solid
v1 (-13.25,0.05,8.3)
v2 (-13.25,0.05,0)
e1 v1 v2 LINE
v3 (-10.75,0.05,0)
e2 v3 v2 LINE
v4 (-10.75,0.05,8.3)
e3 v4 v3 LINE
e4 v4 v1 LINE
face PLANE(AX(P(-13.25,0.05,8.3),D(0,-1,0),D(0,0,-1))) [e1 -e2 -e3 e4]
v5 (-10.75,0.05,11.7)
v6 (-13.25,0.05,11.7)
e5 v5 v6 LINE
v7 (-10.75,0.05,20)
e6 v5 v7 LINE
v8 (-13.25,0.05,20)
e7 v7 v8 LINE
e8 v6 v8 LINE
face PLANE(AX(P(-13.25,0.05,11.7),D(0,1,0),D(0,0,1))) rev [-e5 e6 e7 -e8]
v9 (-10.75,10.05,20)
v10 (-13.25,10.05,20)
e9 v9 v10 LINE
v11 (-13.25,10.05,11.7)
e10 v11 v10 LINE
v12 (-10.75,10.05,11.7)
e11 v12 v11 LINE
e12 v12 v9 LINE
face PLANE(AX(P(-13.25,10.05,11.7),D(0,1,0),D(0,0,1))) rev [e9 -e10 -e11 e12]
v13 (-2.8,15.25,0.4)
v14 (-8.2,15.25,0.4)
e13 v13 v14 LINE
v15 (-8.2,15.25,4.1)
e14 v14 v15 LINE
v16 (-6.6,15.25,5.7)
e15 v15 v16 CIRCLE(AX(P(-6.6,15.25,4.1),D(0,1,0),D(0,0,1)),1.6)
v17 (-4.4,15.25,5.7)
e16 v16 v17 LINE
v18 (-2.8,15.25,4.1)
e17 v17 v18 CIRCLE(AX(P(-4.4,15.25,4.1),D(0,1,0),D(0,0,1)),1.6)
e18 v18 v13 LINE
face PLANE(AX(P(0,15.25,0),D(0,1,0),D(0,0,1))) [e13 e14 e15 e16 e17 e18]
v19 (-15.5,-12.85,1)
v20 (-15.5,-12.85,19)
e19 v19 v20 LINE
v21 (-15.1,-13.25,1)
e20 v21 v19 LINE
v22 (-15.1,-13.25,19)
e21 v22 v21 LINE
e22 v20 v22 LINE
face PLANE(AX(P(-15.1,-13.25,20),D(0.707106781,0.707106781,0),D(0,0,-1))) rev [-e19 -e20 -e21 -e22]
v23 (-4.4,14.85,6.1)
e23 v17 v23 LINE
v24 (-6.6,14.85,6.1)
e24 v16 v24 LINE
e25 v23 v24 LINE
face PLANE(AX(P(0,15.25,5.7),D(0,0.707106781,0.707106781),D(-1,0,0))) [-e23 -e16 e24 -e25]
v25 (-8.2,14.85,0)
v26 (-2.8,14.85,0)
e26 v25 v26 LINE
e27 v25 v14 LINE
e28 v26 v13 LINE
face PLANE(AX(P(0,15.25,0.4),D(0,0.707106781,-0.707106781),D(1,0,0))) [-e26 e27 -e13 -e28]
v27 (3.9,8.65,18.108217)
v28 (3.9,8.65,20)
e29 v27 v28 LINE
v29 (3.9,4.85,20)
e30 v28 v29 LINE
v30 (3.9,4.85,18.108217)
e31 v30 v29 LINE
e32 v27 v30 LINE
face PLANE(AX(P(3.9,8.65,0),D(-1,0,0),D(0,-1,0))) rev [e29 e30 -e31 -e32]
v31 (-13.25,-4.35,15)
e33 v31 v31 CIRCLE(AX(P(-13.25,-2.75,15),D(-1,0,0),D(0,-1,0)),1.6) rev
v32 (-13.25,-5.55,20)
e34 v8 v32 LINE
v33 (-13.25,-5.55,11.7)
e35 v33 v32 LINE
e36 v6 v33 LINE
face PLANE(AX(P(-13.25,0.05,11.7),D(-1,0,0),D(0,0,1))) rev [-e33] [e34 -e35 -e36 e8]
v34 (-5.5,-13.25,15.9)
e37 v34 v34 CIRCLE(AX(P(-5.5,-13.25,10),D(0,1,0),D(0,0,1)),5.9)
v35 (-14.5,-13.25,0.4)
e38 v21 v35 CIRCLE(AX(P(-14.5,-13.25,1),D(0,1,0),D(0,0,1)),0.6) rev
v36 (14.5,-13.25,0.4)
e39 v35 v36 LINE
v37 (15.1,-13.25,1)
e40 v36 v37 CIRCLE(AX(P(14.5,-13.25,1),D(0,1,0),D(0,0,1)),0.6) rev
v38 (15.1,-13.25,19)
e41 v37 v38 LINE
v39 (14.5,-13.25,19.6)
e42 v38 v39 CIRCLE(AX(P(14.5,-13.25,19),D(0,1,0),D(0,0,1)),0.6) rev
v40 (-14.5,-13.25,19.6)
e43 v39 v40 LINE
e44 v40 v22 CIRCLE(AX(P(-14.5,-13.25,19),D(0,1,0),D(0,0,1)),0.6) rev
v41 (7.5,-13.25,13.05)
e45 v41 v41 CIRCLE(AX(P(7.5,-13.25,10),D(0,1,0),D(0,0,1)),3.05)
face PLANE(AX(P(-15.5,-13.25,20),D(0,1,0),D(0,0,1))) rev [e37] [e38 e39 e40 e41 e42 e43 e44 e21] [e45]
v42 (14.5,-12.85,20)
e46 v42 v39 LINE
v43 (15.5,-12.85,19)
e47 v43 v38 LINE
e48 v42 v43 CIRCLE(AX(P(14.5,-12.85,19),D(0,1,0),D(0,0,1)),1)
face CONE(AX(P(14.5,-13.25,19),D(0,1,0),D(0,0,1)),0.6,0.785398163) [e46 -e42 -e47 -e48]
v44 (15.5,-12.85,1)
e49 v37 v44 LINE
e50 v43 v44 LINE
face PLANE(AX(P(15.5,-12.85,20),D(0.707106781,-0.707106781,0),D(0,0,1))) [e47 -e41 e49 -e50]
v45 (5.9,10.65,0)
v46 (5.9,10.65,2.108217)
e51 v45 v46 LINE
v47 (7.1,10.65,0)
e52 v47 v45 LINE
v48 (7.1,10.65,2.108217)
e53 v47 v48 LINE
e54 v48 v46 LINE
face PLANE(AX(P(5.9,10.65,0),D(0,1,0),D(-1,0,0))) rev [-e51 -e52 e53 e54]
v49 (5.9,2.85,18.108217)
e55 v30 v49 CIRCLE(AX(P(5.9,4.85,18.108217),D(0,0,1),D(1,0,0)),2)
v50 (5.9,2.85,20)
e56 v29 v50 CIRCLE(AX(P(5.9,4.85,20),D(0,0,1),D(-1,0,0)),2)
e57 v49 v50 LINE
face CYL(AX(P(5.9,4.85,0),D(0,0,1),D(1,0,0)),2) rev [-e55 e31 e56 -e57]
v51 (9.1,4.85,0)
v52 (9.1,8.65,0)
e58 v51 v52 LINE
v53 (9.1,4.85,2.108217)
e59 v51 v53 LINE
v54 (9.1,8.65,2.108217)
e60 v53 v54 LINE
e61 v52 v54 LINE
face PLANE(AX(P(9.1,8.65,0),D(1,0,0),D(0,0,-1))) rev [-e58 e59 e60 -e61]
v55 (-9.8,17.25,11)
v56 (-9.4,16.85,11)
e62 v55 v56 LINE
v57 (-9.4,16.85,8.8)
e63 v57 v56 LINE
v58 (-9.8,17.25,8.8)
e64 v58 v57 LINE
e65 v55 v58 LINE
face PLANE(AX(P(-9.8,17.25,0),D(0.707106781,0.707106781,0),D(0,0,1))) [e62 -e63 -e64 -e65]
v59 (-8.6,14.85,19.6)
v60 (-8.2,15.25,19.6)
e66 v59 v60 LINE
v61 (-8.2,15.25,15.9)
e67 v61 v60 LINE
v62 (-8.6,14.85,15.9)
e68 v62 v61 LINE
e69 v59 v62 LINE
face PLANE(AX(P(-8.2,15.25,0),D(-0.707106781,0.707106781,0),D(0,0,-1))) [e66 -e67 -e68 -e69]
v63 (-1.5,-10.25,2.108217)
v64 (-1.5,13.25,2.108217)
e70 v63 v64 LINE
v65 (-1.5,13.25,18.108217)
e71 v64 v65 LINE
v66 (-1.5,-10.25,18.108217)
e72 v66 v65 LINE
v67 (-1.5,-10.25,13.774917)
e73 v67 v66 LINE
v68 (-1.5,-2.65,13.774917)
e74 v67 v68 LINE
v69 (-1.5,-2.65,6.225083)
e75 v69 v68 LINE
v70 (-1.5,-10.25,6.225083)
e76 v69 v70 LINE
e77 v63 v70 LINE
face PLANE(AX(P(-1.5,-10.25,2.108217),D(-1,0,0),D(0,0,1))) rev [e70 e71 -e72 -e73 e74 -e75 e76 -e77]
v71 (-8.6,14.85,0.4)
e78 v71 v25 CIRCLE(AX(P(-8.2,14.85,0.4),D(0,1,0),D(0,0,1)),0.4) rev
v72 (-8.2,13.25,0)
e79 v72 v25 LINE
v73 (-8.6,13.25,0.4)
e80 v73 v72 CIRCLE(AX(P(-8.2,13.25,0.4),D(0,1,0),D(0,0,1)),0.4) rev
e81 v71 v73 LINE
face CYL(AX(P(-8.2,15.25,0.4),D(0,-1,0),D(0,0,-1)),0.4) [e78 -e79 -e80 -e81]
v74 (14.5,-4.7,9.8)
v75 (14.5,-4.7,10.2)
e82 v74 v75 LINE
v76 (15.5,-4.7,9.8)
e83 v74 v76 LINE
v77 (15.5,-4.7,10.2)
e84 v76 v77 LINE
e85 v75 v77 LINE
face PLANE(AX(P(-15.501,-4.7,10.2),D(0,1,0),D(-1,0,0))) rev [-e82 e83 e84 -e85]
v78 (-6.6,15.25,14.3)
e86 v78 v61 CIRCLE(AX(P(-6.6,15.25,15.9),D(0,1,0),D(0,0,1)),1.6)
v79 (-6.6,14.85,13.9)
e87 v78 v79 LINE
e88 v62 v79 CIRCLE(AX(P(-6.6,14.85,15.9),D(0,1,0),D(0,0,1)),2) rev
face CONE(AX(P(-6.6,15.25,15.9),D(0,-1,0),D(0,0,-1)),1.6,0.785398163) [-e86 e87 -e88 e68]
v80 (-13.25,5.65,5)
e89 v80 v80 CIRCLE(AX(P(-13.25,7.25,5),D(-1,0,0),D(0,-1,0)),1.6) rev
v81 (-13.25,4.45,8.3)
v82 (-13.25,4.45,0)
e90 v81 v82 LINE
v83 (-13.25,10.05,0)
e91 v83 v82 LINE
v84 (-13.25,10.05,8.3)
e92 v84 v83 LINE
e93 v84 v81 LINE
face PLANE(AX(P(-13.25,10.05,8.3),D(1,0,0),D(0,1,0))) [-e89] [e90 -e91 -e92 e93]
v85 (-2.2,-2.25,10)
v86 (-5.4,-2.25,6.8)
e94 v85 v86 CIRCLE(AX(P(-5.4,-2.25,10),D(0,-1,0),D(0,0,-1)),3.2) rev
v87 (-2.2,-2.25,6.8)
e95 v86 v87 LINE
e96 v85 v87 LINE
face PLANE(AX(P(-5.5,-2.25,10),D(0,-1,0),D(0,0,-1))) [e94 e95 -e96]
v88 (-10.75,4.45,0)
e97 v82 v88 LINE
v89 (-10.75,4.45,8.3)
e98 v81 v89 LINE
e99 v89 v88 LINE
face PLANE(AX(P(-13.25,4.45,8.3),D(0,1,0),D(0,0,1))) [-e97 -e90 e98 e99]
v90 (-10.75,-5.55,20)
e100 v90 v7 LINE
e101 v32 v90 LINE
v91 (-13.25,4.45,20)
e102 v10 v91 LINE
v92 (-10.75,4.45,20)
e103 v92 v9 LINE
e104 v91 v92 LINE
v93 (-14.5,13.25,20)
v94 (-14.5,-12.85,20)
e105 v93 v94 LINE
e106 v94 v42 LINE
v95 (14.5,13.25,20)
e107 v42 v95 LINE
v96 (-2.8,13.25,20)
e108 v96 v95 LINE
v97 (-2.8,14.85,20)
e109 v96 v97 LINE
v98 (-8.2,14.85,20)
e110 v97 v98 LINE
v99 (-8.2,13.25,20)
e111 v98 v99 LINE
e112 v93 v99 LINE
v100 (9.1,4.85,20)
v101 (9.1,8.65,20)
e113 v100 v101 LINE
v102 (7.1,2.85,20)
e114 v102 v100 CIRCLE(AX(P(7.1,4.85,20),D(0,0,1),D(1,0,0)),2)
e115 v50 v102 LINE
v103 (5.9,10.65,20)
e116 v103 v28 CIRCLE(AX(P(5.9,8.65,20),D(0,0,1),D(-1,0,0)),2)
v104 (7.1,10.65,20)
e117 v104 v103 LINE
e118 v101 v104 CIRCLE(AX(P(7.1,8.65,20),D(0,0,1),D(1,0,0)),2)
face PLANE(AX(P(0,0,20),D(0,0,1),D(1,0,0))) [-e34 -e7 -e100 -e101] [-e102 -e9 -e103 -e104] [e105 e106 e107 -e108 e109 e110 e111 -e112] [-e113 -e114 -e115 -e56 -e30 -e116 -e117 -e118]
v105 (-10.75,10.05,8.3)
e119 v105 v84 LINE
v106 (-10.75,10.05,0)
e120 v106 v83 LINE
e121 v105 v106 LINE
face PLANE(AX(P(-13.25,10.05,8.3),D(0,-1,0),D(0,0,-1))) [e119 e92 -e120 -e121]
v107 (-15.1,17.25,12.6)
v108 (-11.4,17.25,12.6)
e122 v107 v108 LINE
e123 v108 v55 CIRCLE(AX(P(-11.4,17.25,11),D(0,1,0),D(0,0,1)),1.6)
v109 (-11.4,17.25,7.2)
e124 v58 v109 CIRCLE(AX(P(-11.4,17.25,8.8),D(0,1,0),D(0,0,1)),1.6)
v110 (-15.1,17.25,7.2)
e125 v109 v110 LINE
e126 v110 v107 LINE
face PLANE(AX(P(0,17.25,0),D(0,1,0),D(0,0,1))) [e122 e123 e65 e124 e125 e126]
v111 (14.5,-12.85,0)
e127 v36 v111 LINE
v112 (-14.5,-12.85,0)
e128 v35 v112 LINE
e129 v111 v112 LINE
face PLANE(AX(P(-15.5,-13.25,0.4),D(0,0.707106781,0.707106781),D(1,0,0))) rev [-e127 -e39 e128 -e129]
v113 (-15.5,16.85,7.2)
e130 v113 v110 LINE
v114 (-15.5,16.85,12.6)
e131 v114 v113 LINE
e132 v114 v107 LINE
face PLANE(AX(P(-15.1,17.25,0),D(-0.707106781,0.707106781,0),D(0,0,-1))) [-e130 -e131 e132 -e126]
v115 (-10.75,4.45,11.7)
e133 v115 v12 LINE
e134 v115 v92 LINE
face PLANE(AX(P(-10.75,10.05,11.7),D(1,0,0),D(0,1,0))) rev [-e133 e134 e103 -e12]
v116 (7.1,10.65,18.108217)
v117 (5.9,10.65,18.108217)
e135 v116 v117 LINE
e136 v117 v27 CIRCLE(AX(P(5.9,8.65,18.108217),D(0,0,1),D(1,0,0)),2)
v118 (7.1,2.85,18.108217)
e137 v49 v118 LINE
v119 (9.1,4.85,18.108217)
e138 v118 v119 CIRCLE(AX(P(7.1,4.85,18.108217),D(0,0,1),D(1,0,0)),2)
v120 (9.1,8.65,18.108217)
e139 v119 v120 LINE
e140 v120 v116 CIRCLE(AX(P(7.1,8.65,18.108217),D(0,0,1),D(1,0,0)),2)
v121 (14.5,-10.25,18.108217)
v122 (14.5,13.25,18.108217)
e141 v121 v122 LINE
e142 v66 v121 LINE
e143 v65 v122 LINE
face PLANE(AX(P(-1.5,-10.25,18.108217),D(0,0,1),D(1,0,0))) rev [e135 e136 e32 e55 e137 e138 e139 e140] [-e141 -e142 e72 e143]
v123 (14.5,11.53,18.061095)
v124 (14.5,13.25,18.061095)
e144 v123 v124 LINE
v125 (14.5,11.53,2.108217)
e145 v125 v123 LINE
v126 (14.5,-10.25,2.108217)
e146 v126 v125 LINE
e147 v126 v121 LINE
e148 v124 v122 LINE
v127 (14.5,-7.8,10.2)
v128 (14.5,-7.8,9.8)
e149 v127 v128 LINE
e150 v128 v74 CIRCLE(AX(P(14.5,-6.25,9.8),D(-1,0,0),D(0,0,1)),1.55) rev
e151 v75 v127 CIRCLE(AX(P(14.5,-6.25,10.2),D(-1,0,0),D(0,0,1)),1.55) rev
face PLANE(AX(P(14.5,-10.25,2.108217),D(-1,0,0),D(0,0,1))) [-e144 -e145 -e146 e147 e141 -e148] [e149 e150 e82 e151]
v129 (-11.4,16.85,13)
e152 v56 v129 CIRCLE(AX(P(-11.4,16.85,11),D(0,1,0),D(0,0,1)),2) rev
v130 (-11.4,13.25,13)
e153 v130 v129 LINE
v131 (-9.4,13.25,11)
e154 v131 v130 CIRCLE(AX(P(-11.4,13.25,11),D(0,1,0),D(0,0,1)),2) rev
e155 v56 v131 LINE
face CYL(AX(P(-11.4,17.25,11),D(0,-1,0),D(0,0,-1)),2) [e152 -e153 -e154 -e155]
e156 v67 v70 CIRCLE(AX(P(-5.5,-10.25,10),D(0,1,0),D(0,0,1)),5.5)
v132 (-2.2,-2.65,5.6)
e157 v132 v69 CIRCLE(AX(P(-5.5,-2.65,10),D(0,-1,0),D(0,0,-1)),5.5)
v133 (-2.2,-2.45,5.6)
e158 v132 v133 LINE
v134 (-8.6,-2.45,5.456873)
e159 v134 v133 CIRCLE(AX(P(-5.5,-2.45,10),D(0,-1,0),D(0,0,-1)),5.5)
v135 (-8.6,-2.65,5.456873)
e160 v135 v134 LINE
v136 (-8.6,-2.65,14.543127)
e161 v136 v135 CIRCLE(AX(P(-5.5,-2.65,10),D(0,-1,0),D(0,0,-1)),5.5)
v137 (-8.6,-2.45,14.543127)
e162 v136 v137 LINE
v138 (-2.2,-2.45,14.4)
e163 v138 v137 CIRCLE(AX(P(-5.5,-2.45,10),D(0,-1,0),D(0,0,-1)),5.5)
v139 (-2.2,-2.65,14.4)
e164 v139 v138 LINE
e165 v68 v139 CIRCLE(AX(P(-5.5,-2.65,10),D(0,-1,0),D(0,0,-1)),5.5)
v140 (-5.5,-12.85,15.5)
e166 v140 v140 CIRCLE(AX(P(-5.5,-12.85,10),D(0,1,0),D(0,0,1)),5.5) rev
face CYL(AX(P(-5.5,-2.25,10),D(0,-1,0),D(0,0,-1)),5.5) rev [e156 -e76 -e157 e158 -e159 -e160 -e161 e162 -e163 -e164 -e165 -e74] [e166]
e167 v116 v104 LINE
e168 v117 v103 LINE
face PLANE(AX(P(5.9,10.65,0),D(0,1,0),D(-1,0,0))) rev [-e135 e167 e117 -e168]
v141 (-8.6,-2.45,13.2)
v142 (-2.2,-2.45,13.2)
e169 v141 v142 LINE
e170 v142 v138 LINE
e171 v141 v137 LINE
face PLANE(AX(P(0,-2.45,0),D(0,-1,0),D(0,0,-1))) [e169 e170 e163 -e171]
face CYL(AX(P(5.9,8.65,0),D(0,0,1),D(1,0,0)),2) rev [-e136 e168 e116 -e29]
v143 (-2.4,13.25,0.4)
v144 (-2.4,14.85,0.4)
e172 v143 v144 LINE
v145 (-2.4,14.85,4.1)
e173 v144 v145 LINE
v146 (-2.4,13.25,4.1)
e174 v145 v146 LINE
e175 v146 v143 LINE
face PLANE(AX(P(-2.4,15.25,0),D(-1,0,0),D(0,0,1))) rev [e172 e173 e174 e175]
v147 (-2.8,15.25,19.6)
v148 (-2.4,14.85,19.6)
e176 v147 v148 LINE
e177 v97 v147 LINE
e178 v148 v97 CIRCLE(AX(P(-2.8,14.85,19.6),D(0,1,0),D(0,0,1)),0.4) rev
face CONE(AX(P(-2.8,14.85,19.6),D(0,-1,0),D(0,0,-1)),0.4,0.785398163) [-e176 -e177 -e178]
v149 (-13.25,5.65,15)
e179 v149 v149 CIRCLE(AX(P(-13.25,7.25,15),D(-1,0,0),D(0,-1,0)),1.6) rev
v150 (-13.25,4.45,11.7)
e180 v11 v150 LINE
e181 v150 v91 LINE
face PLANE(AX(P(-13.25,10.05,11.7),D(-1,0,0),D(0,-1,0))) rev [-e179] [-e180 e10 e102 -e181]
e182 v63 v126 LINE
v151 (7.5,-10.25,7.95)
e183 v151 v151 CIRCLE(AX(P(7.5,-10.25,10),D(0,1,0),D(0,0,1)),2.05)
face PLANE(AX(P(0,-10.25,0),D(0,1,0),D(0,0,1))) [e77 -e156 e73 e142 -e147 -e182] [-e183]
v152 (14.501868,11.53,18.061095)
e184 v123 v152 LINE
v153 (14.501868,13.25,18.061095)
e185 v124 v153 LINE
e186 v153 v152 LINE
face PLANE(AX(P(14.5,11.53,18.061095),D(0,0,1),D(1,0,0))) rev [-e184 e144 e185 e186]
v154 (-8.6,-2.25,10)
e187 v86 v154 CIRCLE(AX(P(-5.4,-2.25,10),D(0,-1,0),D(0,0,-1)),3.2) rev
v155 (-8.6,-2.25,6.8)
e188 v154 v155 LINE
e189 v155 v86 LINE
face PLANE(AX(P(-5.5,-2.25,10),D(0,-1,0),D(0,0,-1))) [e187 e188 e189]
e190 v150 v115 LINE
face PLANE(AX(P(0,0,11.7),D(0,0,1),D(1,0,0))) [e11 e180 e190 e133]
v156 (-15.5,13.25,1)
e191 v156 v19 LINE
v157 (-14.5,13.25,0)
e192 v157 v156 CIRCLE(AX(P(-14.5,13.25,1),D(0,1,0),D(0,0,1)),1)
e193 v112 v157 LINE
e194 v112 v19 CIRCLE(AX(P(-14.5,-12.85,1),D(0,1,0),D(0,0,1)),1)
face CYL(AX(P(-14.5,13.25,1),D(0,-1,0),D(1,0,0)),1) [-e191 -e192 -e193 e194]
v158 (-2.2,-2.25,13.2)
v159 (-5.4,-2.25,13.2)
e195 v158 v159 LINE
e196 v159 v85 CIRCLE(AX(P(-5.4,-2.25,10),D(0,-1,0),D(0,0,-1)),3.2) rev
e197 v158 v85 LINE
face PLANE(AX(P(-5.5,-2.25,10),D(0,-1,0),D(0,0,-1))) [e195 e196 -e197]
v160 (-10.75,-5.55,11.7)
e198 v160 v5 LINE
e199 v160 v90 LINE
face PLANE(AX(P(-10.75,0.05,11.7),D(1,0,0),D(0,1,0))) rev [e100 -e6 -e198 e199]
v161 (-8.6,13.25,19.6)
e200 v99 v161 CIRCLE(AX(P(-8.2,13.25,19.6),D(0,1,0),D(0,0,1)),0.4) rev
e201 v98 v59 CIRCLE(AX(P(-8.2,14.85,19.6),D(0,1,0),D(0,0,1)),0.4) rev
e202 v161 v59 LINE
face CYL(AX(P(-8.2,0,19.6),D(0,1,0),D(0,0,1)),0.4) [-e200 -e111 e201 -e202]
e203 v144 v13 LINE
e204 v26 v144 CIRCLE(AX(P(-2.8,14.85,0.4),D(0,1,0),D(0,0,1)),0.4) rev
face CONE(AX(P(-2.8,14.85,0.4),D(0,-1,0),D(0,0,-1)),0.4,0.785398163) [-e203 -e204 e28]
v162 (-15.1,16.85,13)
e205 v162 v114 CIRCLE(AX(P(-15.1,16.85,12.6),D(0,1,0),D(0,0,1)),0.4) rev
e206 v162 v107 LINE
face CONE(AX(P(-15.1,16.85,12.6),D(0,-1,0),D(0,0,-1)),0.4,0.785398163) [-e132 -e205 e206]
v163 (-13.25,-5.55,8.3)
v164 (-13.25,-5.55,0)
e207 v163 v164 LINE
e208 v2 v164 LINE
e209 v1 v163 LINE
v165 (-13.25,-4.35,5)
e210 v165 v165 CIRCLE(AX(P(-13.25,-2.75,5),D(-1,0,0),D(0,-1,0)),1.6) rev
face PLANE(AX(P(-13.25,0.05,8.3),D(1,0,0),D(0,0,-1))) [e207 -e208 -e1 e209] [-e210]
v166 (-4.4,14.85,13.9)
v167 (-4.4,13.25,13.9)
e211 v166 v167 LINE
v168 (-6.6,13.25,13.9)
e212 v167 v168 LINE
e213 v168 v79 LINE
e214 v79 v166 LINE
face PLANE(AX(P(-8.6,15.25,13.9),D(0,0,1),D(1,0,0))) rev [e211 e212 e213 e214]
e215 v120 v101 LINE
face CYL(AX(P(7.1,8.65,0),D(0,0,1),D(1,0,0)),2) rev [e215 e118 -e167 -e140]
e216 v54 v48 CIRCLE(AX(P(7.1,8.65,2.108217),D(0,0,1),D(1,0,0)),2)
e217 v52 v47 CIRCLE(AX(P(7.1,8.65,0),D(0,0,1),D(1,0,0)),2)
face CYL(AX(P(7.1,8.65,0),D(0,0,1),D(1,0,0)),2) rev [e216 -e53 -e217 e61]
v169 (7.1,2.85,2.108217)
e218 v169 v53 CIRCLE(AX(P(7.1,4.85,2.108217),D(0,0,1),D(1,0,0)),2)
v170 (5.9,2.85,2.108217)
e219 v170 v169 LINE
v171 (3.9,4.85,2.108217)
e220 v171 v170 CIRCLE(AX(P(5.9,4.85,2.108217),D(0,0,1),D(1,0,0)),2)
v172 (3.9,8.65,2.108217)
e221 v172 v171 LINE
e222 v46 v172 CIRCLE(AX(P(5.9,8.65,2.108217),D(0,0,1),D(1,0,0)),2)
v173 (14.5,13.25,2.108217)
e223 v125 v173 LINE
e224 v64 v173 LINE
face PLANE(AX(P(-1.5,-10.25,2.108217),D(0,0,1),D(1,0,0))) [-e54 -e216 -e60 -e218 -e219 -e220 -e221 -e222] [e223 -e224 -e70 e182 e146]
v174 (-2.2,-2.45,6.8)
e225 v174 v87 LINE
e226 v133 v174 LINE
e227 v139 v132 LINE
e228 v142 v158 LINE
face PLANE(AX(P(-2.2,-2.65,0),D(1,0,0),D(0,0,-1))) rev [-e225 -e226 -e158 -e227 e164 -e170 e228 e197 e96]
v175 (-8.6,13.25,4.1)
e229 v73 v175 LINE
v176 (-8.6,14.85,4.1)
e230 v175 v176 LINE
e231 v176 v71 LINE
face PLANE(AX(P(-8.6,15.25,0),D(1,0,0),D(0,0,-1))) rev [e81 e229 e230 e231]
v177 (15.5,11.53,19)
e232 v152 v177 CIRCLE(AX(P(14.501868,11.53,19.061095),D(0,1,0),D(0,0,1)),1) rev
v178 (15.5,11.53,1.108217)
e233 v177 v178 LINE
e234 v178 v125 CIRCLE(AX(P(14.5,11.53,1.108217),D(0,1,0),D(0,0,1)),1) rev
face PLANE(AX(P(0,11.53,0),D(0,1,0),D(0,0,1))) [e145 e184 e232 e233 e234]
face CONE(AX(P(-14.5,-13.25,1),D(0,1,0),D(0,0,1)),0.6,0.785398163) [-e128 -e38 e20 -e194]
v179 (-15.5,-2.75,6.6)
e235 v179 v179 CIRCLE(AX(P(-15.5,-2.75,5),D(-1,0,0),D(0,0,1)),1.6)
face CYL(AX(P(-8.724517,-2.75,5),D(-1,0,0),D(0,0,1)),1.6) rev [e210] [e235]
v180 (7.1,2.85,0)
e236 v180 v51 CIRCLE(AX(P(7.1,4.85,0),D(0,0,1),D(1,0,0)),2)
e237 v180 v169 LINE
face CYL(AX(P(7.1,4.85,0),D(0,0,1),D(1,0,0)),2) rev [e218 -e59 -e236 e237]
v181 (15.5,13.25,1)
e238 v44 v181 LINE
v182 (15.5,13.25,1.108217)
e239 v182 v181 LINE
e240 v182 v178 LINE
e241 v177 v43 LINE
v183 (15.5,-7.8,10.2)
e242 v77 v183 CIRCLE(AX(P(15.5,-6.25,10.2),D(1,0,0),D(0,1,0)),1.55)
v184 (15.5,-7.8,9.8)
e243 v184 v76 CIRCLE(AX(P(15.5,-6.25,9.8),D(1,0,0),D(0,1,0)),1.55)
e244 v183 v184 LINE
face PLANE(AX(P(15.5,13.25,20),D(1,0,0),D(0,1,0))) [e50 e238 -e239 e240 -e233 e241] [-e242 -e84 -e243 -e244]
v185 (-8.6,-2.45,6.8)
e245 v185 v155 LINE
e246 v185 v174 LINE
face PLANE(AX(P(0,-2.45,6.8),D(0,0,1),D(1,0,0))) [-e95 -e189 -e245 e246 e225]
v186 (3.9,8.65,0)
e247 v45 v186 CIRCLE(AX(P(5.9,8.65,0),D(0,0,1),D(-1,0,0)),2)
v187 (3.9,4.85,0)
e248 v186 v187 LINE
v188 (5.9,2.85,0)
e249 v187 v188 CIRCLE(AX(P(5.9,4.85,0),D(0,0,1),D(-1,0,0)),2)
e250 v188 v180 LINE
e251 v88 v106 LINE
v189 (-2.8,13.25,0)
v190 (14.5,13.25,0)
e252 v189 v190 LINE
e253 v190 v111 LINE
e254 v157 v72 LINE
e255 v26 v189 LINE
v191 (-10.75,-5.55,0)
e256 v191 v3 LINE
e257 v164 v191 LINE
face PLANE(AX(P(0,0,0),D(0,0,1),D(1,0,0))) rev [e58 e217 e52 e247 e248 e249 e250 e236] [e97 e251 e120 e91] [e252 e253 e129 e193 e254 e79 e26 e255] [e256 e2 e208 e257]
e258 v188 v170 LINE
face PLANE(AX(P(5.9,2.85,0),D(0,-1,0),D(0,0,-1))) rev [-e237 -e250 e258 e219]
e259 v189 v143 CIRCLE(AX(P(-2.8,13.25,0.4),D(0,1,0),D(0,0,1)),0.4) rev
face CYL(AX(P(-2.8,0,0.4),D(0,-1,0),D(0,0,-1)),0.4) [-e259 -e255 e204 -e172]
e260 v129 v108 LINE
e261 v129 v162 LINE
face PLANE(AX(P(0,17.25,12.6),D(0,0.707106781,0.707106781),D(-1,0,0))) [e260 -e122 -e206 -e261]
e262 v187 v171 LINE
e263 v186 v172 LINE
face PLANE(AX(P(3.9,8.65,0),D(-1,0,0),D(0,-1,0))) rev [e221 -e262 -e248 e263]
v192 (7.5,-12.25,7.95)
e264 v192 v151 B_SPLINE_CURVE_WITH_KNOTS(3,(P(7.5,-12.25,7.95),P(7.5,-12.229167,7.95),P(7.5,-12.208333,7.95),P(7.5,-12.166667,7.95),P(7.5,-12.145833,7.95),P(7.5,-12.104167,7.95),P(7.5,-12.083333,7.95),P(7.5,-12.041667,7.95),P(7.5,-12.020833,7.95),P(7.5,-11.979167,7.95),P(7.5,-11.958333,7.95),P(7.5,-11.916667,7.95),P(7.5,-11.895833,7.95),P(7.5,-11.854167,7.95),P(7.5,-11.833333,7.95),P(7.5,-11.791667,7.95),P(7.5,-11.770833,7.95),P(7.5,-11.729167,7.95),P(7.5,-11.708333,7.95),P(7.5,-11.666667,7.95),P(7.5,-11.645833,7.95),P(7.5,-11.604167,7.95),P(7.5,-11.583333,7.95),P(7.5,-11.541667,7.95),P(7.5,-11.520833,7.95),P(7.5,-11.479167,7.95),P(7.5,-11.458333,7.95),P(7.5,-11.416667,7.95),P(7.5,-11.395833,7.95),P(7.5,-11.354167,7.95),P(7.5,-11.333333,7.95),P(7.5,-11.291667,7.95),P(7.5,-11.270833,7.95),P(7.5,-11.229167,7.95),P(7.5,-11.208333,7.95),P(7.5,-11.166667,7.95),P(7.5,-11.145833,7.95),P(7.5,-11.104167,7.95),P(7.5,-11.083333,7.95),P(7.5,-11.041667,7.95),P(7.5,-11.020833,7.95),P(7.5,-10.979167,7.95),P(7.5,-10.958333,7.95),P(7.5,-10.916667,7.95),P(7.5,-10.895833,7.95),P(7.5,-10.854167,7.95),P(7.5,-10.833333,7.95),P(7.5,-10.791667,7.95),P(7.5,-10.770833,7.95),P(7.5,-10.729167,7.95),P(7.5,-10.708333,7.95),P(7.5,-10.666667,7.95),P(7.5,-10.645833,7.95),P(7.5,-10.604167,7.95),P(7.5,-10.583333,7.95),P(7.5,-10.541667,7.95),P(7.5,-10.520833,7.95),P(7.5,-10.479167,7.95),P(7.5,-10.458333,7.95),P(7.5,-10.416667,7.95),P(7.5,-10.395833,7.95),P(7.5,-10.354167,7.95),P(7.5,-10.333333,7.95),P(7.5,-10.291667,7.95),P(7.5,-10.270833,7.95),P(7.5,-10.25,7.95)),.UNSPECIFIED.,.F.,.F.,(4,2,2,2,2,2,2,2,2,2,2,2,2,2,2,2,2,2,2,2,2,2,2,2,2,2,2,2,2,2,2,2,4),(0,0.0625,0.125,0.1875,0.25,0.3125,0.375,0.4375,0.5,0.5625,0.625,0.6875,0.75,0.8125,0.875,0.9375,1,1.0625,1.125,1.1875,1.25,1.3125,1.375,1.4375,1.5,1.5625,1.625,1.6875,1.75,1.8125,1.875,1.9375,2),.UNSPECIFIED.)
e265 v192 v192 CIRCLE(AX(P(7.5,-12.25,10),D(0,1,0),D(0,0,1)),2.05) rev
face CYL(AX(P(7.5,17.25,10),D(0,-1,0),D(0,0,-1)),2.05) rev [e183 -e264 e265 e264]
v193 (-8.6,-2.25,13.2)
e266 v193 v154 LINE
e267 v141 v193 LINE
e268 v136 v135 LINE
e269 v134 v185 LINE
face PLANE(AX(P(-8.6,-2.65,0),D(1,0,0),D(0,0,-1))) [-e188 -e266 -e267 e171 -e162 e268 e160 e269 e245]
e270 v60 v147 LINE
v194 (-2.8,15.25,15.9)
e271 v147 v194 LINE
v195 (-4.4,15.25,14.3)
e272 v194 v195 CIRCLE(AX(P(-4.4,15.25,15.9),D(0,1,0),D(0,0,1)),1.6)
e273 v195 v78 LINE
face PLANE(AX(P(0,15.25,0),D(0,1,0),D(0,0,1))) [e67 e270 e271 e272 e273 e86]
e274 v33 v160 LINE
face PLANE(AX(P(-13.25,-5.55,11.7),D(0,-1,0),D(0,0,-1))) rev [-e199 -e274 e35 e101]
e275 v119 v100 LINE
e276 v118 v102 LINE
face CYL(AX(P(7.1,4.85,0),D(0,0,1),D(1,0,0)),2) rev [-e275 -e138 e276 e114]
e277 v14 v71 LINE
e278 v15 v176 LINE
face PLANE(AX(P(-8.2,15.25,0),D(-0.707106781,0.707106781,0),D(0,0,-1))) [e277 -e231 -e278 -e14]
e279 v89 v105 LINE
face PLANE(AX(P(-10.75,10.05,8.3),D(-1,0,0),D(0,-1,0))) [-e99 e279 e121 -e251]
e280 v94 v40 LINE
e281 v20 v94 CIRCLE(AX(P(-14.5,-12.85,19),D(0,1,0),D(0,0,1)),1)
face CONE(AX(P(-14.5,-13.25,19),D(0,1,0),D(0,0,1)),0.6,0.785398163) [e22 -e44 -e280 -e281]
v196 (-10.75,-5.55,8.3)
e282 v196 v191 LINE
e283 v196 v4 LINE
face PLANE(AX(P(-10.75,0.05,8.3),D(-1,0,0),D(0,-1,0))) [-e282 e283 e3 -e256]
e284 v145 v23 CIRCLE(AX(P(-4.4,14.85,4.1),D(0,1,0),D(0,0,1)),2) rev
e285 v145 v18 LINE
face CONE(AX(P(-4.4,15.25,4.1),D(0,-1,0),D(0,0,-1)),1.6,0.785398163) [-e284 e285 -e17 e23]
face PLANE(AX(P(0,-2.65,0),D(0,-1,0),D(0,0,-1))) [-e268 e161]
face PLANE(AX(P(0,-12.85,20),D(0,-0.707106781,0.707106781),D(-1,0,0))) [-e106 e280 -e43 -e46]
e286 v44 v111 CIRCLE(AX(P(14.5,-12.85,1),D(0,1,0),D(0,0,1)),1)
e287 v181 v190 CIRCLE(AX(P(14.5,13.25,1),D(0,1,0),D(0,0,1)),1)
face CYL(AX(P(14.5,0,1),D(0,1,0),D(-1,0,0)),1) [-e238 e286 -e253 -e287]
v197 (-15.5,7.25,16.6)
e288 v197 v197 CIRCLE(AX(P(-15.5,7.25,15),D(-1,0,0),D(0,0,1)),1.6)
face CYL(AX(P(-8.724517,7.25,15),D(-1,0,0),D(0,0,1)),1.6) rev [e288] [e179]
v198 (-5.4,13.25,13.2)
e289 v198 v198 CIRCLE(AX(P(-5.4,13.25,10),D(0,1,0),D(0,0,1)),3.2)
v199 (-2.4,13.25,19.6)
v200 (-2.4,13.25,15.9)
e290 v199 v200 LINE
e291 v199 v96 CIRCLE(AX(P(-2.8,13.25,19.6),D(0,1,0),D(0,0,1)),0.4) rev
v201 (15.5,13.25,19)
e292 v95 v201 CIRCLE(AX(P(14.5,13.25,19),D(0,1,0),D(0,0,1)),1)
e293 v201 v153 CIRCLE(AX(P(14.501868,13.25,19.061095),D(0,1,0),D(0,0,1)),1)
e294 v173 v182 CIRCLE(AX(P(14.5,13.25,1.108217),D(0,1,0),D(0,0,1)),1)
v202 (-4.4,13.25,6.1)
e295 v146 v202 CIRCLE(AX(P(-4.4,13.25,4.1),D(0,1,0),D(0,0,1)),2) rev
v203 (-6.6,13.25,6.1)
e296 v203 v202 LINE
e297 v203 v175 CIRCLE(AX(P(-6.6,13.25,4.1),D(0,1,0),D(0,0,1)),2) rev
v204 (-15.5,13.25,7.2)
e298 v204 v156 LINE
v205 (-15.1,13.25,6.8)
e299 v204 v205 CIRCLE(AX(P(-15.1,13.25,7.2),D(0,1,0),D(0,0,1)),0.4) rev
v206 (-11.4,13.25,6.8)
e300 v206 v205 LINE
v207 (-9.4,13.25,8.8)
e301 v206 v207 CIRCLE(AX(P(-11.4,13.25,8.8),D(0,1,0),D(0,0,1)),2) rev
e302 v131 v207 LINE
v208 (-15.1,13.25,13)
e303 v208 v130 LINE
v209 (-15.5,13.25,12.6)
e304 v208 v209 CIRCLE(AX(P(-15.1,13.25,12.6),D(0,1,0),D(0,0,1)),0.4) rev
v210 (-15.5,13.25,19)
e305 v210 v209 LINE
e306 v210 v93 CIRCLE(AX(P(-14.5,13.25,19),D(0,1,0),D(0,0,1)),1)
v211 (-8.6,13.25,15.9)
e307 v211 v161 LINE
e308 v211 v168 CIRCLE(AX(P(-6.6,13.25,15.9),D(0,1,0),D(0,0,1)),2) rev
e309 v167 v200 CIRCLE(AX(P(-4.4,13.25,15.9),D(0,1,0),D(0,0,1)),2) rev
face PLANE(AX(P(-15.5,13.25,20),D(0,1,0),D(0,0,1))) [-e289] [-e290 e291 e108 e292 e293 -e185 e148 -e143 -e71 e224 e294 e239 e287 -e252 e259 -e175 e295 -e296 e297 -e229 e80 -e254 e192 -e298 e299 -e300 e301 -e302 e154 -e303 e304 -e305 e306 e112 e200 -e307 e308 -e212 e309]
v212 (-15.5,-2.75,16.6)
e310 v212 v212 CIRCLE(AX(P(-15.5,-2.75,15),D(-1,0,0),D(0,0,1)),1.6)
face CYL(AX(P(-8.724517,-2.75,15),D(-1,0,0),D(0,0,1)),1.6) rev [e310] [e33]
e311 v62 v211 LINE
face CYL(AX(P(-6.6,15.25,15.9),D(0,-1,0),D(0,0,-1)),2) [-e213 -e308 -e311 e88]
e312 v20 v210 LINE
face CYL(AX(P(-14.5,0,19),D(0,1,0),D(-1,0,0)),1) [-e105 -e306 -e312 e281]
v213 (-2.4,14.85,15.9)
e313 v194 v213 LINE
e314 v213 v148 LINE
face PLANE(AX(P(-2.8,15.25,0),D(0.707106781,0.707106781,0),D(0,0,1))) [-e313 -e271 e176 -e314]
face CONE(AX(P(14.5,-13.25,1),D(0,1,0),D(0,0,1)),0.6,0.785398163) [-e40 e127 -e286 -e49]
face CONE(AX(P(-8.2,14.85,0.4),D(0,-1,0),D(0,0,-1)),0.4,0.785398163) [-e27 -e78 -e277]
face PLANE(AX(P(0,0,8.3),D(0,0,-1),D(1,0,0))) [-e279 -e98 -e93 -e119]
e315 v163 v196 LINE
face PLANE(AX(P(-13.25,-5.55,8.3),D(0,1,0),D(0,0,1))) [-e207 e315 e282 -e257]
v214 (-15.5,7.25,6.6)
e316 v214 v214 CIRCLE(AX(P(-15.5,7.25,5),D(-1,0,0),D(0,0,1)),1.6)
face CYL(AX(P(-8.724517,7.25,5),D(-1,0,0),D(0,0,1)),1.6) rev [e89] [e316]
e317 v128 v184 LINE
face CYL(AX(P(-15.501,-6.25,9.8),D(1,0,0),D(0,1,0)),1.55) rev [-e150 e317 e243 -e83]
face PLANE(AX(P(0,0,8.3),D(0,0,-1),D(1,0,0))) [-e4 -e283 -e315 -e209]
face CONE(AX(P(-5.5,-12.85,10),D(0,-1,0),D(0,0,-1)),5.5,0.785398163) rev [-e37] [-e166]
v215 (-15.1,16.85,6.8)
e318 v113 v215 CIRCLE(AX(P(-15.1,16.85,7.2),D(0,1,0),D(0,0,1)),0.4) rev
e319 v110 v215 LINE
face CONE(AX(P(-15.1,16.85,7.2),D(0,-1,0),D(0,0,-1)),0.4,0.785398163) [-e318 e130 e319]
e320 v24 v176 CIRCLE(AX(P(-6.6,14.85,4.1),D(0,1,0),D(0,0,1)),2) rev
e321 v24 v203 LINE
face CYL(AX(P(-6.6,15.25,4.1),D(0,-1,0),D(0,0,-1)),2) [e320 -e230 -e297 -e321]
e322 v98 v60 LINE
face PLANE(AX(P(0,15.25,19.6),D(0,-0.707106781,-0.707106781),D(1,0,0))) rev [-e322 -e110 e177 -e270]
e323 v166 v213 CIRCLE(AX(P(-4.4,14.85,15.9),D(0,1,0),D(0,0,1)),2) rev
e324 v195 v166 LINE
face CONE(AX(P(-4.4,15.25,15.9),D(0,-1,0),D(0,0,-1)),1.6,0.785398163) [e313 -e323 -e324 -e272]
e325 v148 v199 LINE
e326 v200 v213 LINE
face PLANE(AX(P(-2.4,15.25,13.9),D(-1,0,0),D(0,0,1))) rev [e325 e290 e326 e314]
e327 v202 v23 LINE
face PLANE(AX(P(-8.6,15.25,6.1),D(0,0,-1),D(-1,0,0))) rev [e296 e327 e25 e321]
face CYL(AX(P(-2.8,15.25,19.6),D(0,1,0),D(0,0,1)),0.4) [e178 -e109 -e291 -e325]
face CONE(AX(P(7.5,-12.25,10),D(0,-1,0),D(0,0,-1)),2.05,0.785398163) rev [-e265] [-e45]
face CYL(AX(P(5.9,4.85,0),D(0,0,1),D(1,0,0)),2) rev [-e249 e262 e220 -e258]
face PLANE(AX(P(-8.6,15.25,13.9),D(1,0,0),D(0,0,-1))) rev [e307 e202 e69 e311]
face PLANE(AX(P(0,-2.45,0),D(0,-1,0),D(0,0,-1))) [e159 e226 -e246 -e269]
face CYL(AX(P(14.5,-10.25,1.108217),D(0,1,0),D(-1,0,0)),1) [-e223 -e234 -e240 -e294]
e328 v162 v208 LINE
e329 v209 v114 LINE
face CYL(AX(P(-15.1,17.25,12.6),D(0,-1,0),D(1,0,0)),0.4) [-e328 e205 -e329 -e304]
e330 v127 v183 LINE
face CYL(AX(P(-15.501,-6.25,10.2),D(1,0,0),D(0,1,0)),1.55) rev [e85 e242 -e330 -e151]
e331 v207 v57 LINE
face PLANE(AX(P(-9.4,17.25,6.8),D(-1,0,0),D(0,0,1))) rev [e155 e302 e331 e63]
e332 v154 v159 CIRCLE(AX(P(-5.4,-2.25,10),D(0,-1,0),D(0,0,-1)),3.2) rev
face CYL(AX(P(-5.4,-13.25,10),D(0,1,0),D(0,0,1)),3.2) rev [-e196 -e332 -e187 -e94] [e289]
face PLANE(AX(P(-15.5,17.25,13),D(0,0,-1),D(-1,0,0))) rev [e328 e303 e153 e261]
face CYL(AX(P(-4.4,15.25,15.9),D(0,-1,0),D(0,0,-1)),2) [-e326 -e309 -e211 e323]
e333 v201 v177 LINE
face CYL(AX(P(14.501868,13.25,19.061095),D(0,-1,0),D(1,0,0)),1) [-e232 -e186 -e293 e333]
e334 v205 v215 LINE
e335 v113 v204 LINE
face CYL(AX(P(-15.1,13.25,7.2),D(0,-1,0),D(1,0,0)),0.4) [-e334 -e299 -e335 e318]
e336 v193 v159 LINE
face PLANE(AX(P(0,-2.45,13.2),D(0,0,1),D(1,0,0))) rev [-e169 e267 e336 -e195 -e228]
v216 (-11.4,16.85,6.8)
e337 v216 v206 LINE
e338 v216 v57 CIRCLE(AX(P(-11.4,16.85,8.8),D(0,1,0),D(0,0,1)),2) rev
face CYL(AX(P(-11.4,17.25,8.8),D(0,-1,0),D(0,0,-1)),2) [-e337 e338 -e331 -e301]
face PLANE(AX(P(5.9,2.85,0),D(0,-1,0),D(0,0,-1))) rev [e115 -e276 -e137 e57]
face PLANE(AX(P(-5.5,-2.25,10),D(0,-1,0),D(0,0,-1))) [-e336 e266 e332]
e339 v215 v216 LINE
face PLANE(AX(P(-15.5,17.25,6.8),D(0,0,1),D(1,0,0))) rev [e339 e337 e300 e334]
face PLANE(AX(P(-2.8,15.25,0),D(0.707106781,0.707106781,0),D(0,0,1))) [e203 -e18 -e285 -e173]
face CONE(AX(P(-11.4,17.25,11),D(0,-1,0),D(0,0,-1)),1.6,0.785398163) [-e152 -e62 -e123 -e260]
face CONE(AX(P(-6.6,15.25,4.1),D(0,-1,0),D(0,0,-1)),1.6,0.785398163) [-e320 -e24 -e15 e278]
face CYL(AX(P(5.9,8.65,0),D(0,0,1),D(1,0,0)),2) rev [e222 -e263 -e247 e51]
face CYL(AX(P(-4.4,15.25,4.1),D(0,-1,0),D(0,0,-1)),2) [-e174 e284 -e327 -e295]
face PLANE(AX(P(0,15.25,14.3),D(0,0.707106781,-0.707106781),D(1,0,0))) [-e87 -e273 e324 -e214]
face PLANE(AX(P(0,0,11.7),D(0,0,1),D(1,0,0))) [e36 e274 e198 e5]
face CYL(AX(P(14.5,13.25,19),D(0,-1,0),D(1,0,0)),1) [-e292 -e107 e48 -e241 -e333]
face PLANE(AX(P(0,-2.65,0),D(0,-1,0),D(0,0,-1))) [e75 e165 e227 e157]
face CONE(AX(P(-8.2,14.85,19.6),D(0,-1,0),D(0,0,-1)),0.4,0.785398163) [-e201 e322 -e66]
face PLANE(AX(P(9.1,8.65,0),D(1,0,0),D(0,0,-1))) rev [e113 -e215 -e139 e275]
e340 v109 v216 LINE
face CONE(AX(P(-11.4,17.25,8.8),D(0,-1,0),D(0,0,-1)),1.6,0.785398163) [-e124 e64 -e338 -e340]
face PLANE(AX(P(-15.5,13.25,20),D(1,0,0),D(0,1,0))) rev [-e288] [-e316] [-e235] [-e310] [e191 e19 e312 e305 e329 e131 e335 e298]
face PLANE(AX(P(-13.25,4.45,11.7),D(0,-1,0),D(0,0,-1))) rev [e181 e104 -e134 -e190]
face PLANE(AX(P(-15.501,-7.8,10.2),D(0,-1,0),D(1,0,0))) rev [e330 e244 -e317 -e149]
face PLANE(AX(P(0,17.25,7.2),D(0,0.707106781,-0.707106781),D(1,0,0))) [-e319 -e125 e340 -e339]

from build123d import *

# Parameters (mm, degrees)
SKETCH_1_W          = 31
SKETCH_1_H          = 26.5
EXTRUDE_1_DEPTH     = 20
SKETCH_3_W          = 16
SKETCH_3_H          = 16
CUT_EXTRUDE_1_DEPTH = 23.5
SKETCH_4_W          = 6.1
SKETCH_4_H          = 6.2
EXTRUDE_2_DEPTH     = 4
SKETCH_5_W          = 6.2
SKETCH_5_H          = 6.1
EXTRUDE_3_DEPTH     = 2
SKETCH_6_R          = 3.2
CUT_EXTRUDE_2_DEPTH = 37.640141921
CUT_EXTRUDE_3_DEPTH = 31.623724463
SKETCH_9_W          = 2.5
SKETCH_9_H          = 5.6
CUT_EXTRUDE_4_DEPTH = 8.3
SKETCH_10_W         = 1
SKETCH_10_H         = 15.952878331
CUT_EXTRUDE_5_DEPTH = 1.72
SKETCH_11_R         = 5.5
CUT_EXTRUDE_6_DEPTH = 11
SKETCH_12_R         = 2.05
CUT_EXTRUDE_7_DEPTH = 40.629534441
CUT_EXTRUDE_8_REACH = 42.725
FILLET_2_R          = 1
FILLET_3_R          = 1
SKETCH_14_R         = 1.6
CUT_EXTRUDE_9_DEPTH = 2.25
CHAMFER_2_SIZE      = 0.4
EXTRUDE_START       = 0.2
EXTRUDE_4_DEPTH     = 0.2
EXTRUDE_START_2     = 0.4
SKETCH_15_4_W       = 0.7
SKETCH_15_4_H       = 6.4
EXTRUDE_5_DEPTH     = 0.4
FILLET_4_R          = 2
FILLET_5_R          = 0.4
CHAMFER_3_SIZE      = 0.4
CHAMFER_4_SIZE      = 0.4
CHAMFER_5_SIZE      = 1


with BuildPart() as part:
    # 草图1 → 凸台-拉伸1 (new body)
    with BuildSketch(Plane.XY):
        Rectangle(SKETCH_1_W, SKETCH_1_H)
    extrude(amount=EXTRUDE_1_DEPTH)

    # 草图3 → 切除-拉伸1 (cut)
    with BuildSketch(Plane(origin=(0, 13.25, 0), x_dir=(1, 0, 0), z_dir=(0, 1, 0))):
        with Locations((6.5, -10.108217082)):
            Rectangle(SKETCH_3_W, SKETCH_3_H)
    extrude(amount=-CUT_EXTRUDE_1_DEPTH, mode=Mode.SUBTRACT)

    # 草图4 → 凸台-拉伸2 (add)
    with BuildSketch(Plane(origin=(0, 13.25, 0), x_dir=(1, 0, 0), z_dir=(0, 1, 0))):
        with Locations((-12.45, -9.9)):
            Rectangle(SKETCH_4_W, SKETCH_4_H)
    extrude(amount=EXTRUDE_2_DEPTH)

    # 草图5 → 凸台-拉伸3 (add)
    with BuildSketch(Plane(origin=(0, 13.25, 0), x_dir=(1, 0, 0), z_dir=(0, 1, 0))):
        with Locations((-5.5, -3.05)):
            Rectangle(SKETCH_5_W, SKETCH_5_H)
        with Locations((-5.5, -16.95)):
            Rectangle(SKETCH_5_W, SKETCH_5_H)
    extrude(amount=EXTRUDE_3_DEPTH)

    # 草图6 → 切除-拉伸2 (cut, through all)
    with BuildSketch(Plane(origin=(0, 13.25, 0), x_dir=(1, 0, 0), z_dir=(0, 1, 0))):
        with Locations(Location((-5.4, -10, 0), (0, 0, 270))):
            Circle(SKETCH_6_R)
    extrude(amount=-CUT_EXTRUDE_2_DEPTH, mode=Mode.SUBTRACT)

    # 草图8 → 切除-拉伸3 (cut, through all)
    with BuildSketch(Plane.XY.offset(20)):
        with BuildLine():
            Line((5.9, 10.65), (7.1, 10.65))
            ThreePointArc((7.1, 10.65), (8.514213562, 10.064213562), (9.1, 8.65))
            Line((9.1, 8.65), (9.1, 4.85))
            ThreePointArc((9.1, 4.85), (8.514213562, 3.435786438), (7.1, 2.85))
            Line((7.1, 2.85), (5.9, 2.85))
            ThreePointArc((5.9, 2.85), (4.485786438, 3.435786438), (3.9, 4.85))
            Line((3.9, 4.85), (3.9, 8.65))
            ThreePointArc((3.9, 8.65), (4.485786438, 10.064213562), (5.9, 10.65))
        make_face()
    extrude(amount=-CUT_EXTRUDE_3_DEPTH, mode=Mode.SUBTRACT)

    # 草图9 → 切除-拉伸4 (cut)
    with BuildSketch(Plane.XY.offset(20)):
        with Locations((-12, 7.25)):
            Rectangle(SKETCH_9_W, SKETCH_9_H)
        with Locations((-12, -2.75)):
            Rectangle(SKETCH_9_W, SKETCH_9_H)
    cut_extrude_4 = extrude(amount=-CUT_EXTRUDE_4_DEPTH, mode=Mode.SUBTRACT)

    # 草图10 → 切除-拉伸5 (cut)
    with BuildSketch(Plane(origin=(0, 13.25, 0), x_dir=(1, 0, 0), z_dir=(0, 1, 0))):
        with Locations((15, -10.084656247)):
            Rectangle(SKETCH_10_W, SKETCH_10_H)
    extrude(amount=-CUT_EXTRUDE_5_DEPTH, mode=Mode.SUBTRACT)

    # 草图11 → 切除-拉伸6 (cut)
    with BuildSketch(Plane.XZ.offset(13.25)):
        with Locations(Location((-5.5, 10, 0), (0, 0, 270))):
            Circle(SKETCH_11_R)
    extrude(amount=-CUT_EXTRUDE_6_DEPTH, mode=Mode.SUBTRACT)

    # 草图12 → 切除-拉伸7 (cut, through all)
    with BuildSketch(Plane(origin=(0, -13.25, 0), x_dir=(-1, 0, 0), z_dir=(0, -1, 0))):
        with Locations(Location((-7.5, -10, 0), (0, 0, 90))):
            Circle(SKETCH_12_R)
    extrude(amount=-CUT_EXTRUDE_7_DEPTH, mode=Mode.SUBTRACT)

    # 草图13 → 切除-拉伸8 (cut, up to next)
    with BuildSketch(Plane(origin=(15.5, 0, 0), x_dir=(0, 0, -1), z_dir=(1, 0, 0)), mode=Mode.PRIVATE) as cut_extrude_8_sk1:
        with BuildLine():
            Line((-10.2, -4.7), (-9.8, -4.7))
            ThreePointArc((-9.8, -4.7), (-8.25, -6.25), (-9.8, -7.8))
            Line((-9.8, -7.8), (-10.2, -7.8))
            ThreePointArc((-10.2, -7.8), (-11.75, -6.25), (-10.2, -4.7))
        make_face()
    cut_extrude_8_tool1 = extrude(cut_extrude_8_sk1.sketch, amount=-CUT_EXTRUDE_8_REACH, mode=Mode.PRIVATE) & part.part
    add(cut_extrude_8_tool1.solids().sort_by_distance((15.5, -6.25, 10))[0], mode=Mode.SUBTRACT)

    # 圆角2
    fillet_2_edges = [part.edges().sort_by_distance(p)[0] for p in [
        (15.5, 0, 20),
        (-15.5, 0, 20),
        (15.5, 0, 0),
        (-15.5, 0, 0),
    ]]
    fillet(fillet_2_edges, radius=FILLET_2_R)

    # 圆角3
    # the kernel refuses this fillet: 1 mm, written as the material it takes off along each edge
    with BuildSketch(Plane(origin=(15.5, 15.745329826, 18.061095413), x_dir=(0, 0, 1), z_dir=(0, -1, 0))) as fillet_3_piece_1:
        with BuildLine():
            CenterArc((1, 0.99813193), FILLET_3_R, 180, 86.497309331)
            Line((0, 0.99813193), (-0.02, 0.99813193))
            Line((-0.02, 0.99813193), (-0.02, 0))
            Line((-0.02, 0), (0, -0.02))
            ThreePointArc((0, -0.02), (0.469452294, -0.02), (0.937682679, -0.019962639))
            Line((0.937682679, -0.019962639), (0.938904587, 0))
        make_face()
    extrude(amount=4.215329826, mode=Mode.SUBTRACT)
    with BuildSketch(Plane(origin=(15.5, 15.75, 2.108217082), x_dir=(0, 0, -1), z_dir=(0, -1, 0))) as fillet_3_piece_2:
        with BuildLine():
            CenterArc((FILLET_3_R, -FILLET_3_R), FILLET_3_R, 90, 90)
            Line((0, -FILLET_3_R), (-FILLET_3_R * 0.02, -FILLET_3_R))
            Line((-FILLET_3_R * 0.02, -FILLET_3_R), (-FILLET_3_R * 0.02, FILLET_3_R * 0.02))
            Line((-FILLET_3_R * 0.02, FILLET_3_R * 0.02), (FILLET_3_R, FILLET_3_R * 0.02))
            Line((FILLET_3_R, FILLET_3_R * 0.02), (FILLET_3_R, 0))
        make_face()
    extrude(amount=4.22, mode=Mode.SUBTRACT)

    # 草图14 → 切除-拉伸9 (cut)
    with BuildSketch(Plane.ZY.offset(15.5)):
        with Locations((5, 7.25)):
            Circle(SKETCH_14_R)
        with Locations((15, 7.25)):
            Circle(SKETCH_14_R)
        with Locations((5, -2.75)):
            Circle(SKETCH_14_R)
        with Locations((15, -2.75)):
            Circle(SKETCH_14_R)
    extrude(amount=-CUT_EXTRUDE_9_DEPTH, mode=Mode.SUBTRACT)

    # 镜向1: 切除-拉伸4 across plane
    add(cut_extrude_4.mirror(Plane(origin=(0, 0, 10), x_dir=(1, 0, 0), z_dir=(0, 0, -1))), mode=Mode.SUBTRACT)

    # 倒角2
    chamfer_2_edges = [part.edges().sort_by_distance(p)[0] for p in [
        (0, -13.25, 20),
        (0, -13.25, 0),
        (15.5, -13.25, 10),
        (-15.5, -13.25, 10),
        (15.207106781, -13.25, 0.292893219),
        (15.207106781, -13.25, 19.707106781),
        (-15.207106781, -13.25, 0.292893219),
        (-15.207106781, -13.25, 19.707106781),
    ]]
    chamfer(chamfer_2_edges, length=CHAMFER_2_SIZE)

    # 草图15 → 凸台-拉伸4 (add)
    with BuildSketch(Plane.XZ.offset(2.25).offset(EXTRUDE_START)):
        with BuildLine():
            Line((-8.6, 13.2), (-8.6, 14.543126677))
            ThreePointArc((-8.6, 14.543126677), (-9.3457172, 13.931979046), (-9.973253849, 13.2))
            Line((-9.973253849, 13.2), (-8.6, 13.2))
        make_face()
        with BuildLine():
            ThreePointArc((-2.2, 14.4), (-5.377031258, 15.498625163), (-8.6, 14.543126677))
            Line((-8.6, 14.543126677), (-8.6, 13.2))
            Line((-8.6, 13.2), (-2.2, 13.2))
            Line((-2.2, 13.2), (-2.2, 14.4))
        make_face()
        with BuildLine():
            ThreePointArc((-1.5, 13.774917218), (-1.836643326, 14.102416103), (-2.2, 14.4))
            Line((-2.2, 14.4), (-2.2, 13.2))
            Line((-2.2, 13.2), (-1.5, 13.2))
            Line((-1.5, 13.2), (-1.5, 13.774917218))
        make_face()
        with BuildLine():
            Line((-8.6, 5.456873323), (-8.6, 6.8))
            Line((-8.6, 6.8), (-9.973253849, 6.8))
            ThreePointArc((-9.973253849, 6.8), (-9.3457172, 6.068020954), (-8.6, 5.456873323))
        make_face()
        with BuildLine():
            Line((-2.2, 6.8), (-8.6, 6.8))
            Line((-8.6, 6.8), (-8.6, 5.456873323))
            ThreePointArc((-8.6, 5.456873323), (-5.377031258, 4.501374837), (-2.2, 5.6))
            Line((-2.2, 5.6), (-2.2, 6.8))
        make_face()
        with BuildLine():
            Line((-1.5, 6.8), (-2.2, 6.8))
            Line((-2.2, 6.8), (-2.2, 5.6))
            ThreePointArc((-2.2, 5.6), (-1.836643326, 5.897583897), (-1.5, 6.225082782))
            Line((-1.5, 6.225082782), (-1.5, 6.8))
        make_face()
    extrude(amount=-EXTRUDE_4_DEPTH)

    # 草图15<4> → 凸台-拉伸5 (add)
    with BuildSketch(Plane.XZ.offset(2.25).offset(EXTRUDE_START_2)):
        with BuildLine():
            Line((-8.6, 13.2), (-8.6, 14.543126677))
            ThreePointArc((-8.6, 14.543126677), (-9.3457172, 13.931979046), (-9.973253849, 13.2))
            Line((-9.973253849, 13.2), (-8.6, 13.2))
        make_face()
        with BuildLine():
            Line((-8.6, 6.8), (-8.6, 13.2))
            Line((-8.6, 13.2), (-9.973253849, 13.2))
            ThreePointArc((-9.973253849, 13.2), (-11, 10), (-9.973253849, 6.8))
            Line((-9.973253849, 6.8), (-8.6, 6.8))
        make_face()
        with BuildLine():
            Line((-8.6, 5.456873323), (-8.6, 6.8))
            Line((-8.6, 6.8), (-9.973253849, 6.8))
            ThreePointArc((-9.973253849, 6.8), (-9.3457172, 6.068020954), (-8.6, 5.456873323))
        make_face()
        with BuildLine():
            ThreePointArc((-1.5, 13.774917218), (-1.836643326, 14.102416103), (-2.2, 14.4))
            Line((-2.2, 14.4), (-2.2, 13.2))
            Line((-2.2, 13.2), (-1.5, 13.2))
            Line((-1.5, 13.2), (-1.5, 13.774917218))
        make_face()
        with Locations((-1.85, 10)):
            Rectangle(SKETCH_15_4_W, SKETCH_15_4_H)
        with BuildLine():
            Line((-1.5, 6.8), (-2.2, 6.8))
            Line((-2.2, 6.8), (-2.2, 5.6))
            ThreePointArc((-2.2, 5.6), (-1.836643326, 5.897583897), (-1.5, 6.225082782))
            Line((-1.5, 6.225082782), (-1.5, 6.8))
        make_face()
    extrude(amount=-EXTRUDE_5_DEPTH)

    # 圆角4
    fillet_4_edges = [part.edges().sort_by_distance(p)[0] for p in [
        (-9.4, 15.25, 13),
        (-9.4, 15.25, 6.8),
        (-2.4, 14.25, 6.1),
        (-8.6, 14.25, 6.1),
        (-2.4, 14.25, 13.9),
        (-8.6, 14.25, 13.9),
    ]]
    fillet(fillet_4_edges, radius=FILLET_4_R)

    # 圆角5
    fillet_5_edges = [part.edges().sort_by_distance(p)[0] for p in [
        (-15.5, 15.25, 6.8),
        (-15.5, 15.25, 13),
        (-2.4, 14.25, 0),
        (-8.6, 14.25, 0),
        (-2.4, 14.25, 20),
        (-8.6, 14.25, 20),
    ]]
    fillet(fillet_5_edges, radius=FILLET_5_R)

    # 倒角3
    chamfer_3_edges = [part.edges().sort_by_distance(p)[0] for p in [
        (-8.6, 15.25, 17.75),
        (-5.5, 15.25, 13.9),
        (-2.985786438, 15.25, 14.485786438),
        (-8.014213562, 15.25, 14.485786438),
        (-9.4, 17.25, 9.9),
        (-13.25, 17.25, 6.8),
        (-9.985786438, 17.25, 7.385786438),
        (-9.985786438, 17.25, 12.414213562),
        (-2.4, 15.25, 2.25),
        (-5.5, 15.25, 6.1),
        (-8.014213562, 15.25, 5.514213562),
        (-2.985786438, 15.25, 5.514213562),
        (-5.5, 15.25, 20),
        (-2.4, 15.25, 17.75),
        (-2.517157288, 15.25, 19.882842712),
        (-8.482842712, 15.25, 19.882842712),
        (-5.5, 15.25, 0),
        (-8.6, 15.25, 2.25),
        (-8.482842712, 15.25, 0.117157288),
        (-2.517157288, 15.25, 0.117157288),
        (-13.25, 17.25, 13),
        (-15.5, 17.25, 9.9),
        (-15.382842712, 17.25, 6.917157288),
        (-15.382842712, 17.25, 12.882842712),
    ]]
    chamfer(chamfer_3_edges, length=CHAMFER_3_SIZE)

    # 倒角4
    chamfer_4_edges = [part.edges().sort_by_distance(p)[0] for p in [
        (-5.5, -13.25, 15.5),
    ]]
    chamfer(chamfer_4_edges, length=CHAMFER_4_SIZE)

    # 倒角5
    chamfer_5_edges = [part.edges().sort_by_distance(p)[0] for p in [
        (7.5, -13.25, 12.05),
    ]]
    chamfer(chamfer_5_edges, length=CHAMFER_5_SIZE)


solid = part.part
